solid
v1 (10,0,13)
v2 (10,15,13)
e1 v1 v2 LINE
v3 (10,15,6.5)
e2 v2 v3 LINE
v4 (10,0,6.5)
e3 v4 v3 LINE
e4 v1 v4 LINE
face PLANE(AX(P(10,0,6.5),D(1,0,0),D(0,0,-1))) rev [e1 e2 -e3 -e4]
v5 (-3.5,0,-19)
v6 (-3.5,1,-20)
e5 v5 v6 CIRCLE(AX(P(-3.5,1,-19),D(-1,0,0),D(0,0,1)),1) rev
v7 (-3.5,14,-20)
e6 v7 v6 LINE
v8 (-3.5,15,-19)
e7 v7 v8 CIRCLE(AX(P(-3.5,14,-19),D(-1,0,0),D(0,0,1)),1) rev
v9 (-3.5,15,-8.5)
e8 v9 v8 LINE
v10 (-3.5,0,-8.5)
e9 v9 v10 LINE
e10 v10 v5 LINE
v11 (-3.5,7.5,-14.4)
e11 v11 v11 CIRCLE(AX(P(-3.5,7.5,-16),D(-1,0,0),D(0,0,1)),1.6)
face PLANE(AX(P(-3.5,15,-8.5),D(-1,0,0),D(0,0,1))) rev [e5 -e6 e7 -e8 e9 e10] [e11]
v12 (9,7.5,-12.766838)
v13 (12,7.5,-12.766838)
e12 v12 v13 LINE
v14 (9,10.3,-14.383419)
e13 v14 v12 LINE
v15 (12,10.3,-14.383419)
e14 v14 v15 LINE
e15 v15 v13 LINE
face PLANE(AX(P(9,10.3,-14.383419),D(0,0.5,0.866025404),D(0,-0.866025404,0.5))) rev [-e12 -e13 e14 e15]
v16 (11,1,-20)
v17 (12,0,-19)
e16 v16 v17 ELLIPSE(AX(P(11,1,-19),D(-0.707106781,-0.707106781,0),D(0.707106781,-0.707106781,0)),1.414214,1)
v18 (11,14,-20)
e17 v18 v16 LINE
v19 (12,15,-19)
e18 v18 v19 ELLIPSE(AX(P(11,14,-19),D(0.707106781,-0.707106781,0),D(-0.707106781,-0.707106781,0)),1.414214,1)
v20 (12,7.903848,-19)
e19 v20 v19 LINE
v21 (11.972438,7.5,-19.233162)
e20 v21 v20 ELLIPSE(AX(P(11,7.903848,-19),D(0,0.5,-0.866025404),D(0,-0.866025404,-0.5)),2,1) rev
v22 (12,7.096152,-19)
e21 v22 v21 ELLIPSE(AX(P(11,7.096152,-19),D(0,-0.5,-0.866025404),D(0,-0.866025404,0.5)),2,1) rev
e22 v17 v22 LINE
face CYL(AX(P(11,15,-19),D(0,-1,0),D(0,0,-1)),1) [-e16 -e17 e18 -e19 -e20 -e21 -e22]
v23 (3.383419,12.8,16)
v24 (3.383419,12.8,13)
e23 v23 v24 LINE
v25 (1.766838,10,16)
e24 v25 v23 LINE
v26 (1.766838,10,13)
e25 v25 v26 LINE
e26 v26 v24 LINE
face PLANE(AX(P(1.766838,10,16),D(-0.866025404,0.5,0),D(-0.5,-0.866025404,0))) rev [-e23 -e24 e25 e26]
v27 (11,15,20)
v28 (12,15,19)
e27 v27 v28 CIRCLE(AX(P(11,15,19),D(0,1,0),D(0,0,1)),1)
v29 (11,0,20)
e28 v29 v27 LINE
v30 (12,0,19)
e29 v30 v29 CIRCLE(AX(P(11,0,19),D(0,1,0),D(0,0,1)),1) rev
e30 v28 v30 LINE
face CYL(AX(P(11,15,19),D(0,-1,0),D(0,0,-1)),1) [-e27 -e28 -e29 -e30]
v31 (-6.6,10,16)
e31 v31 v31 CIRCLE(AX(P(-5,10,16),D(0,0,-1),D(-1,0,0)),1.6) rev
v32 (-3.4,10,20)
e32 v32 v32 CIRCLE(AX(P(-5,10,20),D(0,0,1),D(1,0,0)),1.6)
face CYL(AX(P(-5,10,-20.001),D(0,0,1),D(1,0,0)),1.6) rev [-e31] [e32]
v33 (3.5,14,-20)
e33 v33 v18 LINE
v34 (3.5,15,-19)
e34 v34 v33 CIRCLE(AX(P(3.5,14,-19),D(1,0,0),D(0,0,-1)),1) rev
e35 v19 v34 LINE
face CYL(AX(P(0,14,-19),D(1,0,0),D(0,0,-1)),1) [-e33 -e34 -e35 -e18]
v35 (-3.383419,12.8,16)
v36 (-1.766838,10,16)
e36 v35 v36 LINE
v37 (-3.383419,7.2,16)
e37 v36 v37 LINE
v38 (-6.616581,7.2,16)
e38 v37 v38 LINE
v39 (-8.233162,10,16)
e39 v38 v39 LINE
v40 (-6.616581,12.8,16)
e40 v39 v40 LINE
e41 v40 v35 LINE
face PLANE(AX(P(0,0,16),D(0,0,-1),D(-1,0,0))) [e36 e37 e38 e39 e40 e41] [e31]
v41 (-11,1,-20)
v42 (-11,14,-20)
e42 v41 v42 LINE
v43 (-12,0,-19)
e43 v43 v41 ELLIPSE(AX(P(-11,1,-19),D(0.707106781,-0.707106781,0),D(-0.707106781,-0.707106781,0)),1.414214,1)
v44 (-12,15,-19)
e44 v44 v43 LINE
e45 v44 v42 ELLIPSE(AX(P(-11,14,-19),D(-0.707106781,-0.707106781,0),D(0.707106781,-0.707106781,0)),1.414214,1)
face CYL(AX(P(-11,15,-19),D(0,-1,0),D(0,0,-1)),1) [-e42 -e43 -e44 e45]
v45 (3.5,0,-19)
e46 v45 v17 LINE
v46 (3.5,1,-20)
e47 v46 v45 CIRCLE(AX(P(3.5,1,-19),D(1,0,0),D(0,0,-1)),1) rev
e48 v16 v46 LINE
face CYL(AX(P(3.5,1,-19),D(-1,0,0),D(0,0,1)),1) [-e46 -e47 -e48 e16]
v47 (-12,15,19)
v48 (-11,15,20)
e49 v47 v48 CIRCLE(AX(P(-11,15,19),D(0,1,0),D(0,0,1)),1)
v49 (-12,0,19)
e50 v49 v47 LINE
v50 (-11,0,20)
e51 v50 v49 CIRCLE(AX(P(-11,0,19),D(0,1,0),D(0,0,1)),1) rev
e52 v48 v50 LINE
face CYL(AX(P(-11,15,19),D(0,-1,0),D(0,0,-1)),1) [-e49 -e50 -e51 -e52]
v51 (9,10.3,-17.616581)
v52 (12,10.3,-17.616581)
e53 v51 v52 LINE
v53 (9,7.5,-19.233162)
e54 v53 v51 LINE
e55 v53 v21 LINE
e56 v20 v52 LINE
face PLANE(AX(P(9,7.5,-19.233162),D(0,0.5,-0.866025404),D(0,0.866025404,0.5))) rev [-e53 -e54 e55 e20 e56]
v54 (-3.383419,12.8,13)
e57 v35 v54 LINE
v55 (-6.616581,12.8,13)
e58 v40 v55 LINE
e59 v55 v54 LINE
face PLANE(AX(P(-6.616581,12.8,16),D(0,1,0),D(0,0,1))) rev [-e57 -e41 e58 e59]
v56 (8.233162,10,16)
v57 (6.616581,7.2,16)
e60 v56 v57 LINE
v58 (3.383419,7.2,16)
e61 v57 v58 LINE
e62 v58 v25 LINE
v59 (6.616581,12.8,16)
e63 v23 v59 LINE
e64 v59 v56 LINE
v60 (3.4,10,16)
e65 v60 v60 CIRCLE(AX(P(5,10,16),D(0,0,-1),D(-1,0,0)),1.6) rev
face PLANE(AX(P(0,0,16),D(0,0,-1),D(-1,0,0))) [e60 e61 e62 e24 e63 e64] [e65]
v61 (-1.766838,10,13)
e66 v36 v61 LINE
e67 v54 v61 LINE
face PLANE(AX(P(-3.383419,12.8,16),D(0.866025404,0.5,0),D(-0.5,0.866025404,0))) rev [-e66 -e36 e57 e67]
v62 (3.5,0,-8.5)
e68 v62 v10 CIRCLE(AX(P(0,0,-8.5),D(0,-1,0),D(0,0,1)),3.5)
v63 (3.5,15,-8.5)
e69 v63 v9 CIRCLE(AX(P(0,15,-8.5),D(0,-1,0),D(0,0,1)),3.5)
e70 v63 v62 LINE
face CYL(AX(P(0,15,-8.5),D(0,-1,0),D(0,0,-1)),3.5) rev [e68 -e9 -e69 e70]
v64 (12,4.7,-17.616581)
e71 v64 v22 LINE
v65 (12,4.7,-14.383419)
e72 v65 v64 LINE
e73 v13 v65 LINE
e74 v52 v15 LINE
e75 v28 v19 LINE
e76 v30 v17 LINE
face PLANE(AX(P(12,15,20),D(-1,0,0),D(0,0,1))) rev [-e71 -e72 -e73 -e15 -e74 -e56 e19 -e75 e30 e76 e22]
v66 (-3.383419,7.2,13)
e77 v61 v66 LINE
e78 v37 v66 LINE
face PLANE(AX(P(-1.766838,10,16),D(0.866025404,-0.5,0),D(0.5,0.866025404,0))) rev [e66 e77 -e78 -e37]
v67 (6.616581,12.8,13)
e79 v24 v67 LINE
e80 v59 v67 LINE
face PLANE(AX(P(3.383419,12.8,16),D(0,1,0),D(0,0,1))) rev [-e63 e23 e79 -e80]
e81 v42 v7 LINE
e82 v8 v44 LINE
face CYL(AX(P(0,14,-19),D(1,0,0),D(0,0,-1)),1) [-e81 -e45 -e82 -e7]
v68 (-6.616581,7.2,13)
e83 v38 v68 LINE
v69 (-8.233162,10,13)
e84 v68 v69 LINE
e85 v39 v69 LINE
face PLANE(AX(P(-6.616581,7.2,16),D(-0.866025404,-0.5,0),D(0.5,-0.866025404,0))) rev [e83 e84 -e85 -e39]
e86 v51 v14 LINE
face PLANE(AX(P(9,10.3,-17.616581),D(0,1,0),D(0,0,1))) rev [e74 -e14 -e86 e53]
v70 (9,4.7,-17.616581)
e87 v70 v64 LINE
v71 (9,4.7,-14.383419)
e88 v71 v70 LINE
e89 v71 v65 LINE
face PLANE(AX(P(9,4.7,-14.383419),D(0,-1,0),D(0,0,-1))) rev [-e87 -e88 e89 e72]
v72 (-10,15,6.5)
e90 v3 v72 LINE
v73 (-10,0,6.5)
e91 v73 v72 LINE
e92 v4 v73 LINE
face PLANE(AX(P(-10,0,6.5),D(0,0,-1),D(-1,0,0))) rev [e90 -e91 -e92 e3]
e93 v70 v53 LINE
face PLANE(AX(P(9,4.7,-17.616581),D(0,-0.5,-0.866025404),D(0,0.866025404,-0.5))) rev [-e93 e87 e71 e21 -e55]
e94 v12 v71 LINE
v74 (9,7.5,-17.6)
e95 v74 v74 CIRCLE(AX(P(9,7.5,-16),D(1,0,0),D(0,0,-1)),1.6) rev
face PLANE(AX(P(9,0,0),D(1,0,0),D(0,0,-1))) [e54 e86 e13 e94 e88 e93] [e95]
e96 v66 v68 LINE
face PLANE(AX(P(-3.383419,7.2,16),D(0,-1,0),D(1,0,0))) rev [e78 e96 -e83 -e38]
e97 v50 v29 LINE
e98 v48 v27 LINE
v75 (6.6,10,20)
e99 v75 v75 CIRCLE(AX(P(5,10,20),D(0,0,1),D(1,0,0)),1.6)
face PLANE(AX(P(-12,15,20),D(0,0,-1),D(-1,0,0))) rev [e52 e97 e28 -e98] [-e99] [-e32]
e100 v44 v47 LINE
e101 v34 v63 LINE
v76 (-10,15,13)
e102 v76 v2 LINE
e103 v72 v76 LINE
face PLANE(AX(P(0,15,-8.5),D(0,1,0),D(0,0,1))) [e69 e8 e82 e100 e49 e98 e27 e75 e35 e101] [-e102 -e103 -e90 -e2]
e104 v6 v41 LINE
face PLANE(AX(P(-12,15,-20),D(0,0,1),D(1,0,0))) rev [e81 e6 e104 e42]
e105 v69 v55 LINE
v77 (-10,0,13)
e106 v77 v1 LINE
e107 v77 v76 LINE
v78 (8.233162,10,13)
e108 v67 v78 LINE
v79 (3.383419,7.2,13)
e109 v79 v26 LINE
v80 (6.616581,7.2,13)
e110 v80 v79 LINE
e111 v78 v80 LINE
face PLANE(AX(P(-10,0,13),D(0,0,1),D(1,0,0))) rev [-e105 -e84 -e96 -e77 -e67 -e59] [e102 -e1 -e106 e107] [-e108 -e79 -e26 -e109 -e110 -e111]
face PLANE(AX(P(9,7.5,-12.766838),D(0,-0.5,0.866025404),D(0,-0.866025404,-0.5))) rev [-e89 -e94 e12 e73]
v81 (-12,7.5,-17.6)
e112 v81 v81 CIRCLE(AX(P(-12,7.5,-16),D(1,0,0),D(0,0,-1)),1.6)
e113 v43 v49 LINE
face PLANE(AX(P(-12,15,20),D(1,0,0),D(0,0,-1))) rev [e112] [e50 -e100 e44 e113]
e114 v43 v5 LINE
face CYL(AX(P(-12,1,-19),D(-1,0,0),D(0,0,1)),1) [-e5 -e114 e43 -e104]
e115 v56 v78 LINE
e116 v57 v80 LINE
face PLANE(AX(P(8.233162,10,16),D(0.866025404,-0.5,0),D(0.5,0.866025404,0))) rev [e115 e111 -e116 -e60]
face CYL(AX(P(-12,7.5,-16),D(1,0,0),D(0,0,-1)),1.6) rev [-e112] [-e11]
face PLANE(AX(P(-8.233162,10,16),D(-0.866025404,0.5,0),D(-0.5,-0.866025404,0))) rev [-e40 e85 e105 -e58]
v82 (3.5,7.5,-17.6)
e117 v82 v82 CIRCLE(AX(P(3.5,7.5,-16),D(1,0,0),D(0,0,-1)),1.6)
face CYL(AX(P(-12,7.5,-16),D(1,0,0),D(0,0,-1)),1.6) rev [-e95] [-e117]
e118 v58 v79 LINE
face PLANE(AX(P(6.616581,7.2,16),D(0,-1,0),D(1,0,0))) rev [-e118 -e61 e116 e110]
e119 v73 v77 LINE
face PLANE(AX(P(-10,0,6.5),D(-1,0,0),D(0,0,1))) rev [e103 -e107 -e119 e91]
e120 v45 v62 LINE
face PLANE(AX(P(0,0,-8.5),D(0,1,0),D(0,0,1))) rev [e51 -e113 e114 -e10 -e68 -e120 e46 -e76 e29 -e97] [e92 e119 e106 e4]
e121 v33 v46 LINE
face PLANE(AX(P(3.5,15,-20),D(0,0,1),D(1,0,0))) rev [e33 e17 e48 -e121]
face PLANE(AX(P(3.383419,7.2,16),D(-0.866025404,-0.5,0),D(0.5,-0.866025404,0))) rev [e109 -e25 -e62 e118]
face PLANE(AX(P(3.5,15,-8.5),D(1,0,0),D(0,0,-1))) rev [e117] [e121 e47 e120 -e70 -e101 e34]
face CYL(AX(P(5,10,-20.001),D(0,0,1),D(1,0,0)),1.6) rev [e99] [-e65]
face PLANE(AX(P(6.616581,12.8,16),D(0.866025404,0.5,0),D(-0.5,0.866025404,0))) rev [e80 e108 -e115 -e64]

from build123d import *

# Parameters (mm, degrees)
SALIENTE_EXTRUIR2_DEPTH    = 15
CORTAR_EXTRUIR2_DEPTH      = 28.730849248
CORTAR_EXTRUIR2_DEPTH_BACK = 28.730849248
CROQUIS3_R                 = 1.6
CROQUIS4_W                 = 20
CROQUIS4_H                 = 6.5
CORTAR_EXTRUIR3_DEPTH      = 28.730849248
CORTAR_EXTRUIR4_REACH      = 46.373
CROQUIS5_R                 = 1.6
CORTAR_EXTRUIR5_DEPTH      = 3
CORTAR_EXTRUIR6_DEPTH      = 3
REDONDEO1_R                = 1


with BuildPart() as part:
    # Croquis1 → Saliente-Extruir2 (new body)
    with BuildSketch(Plane(origin=(0, 0, 0), x_dir=(1, 0, 0), z_dir=(0, 1, 0))):
        with BuildLine():
            Line((-12, -20), (12, -20))
            Line((12, -20), (12, 20))
            Line((12, 20), (3.5, 20))
            Line((3.5, 20), (3.5, 8.5))
            ThreePointArc((3.5, 8.5), (0, 5), (-3.5, 8.5))
            Line((-3.5, 8.5), (-3.5, 20))
            Line((-3.5, 20), (-12, 20))
            Line((-12, 20), (-12, -20))
        make_face()
    extrude(amount=SALIENTE_EXTRUIR2_DEPTH)

    # Croquis3 → Cortar-Extruir2 (cut, two sides: drawn at the far end of the back side and taken through both)
    with BuildSketch(Plane(origin=(0, 0, 0), x_dir=(0, 0, -1), z_dir=(1, 0, 0)).offset(-CORTAR_EXTRUIR2_DEPTH_BACK)):
        with Locations((16, 7.5)):
            Circle(CROQUIS3_R)
    extrude(amount=CORTAR_EXTRUIR2_DEPTH + CORTAR_EXTRUIR2_DEPTH_BACK, mode=Mode.SUBTRACT)

    # Croquis4 → Cortar-Extruir3 (cut, through all)
    with BuildSketch(Plane(origin=(0, 15, 0), x_dir=(1, 0, 0), z_dir=(0, 1, 0))):
        with Locations((0, -9.75)):
            Rectangle(CROQUIS4_W, CROQUIS4_H)
    extrude(amount=-CORTAR_EXTRUIR3_DEPTH, mode=Mode.SUBTRACT)

    # Croquis5 → Cortar-Extruir4 (cut, up to next)
    with BuildSketch(Plane.XY.offset(20), mode=Mode.PRIVATE) as cortar_extruir4_sk1:
        with Locations((-5, 10)):
            Circle(CROQUIS5_R)
    cortar_extruir4_tool1 = extrude(cortar_extruir4_sk1.sketch, amount=-CORTAR_EXTRUIR4_REACH, mode=Mode.PRIVATE) & part.part
    # Croquis5 → Cortar-Extruir4 (cut, up to next)
    with BuildSketch(Plane.XY.offset(20), mode=Mode.PRIVATE) as cortar_extruir4_sk2:
        with Locations((5, 10)):
            Circle(CROQUIS5_R)
    cortar_extruir4_tool2 = extrude(cortar_extruir4_sk2.sketch, amount=-CORTAR_EXTRUIR4_REACH, mode=Mode.PRIVATE) & part.part
    add(cortar_extruir4_tool1.solids().sort_by_distance((-5, 10, 20))[0], mode=Mode.SUBTRACT)
    add(cortar_extruir4_tool2.solids().sort_by_distance((5, 10, 20))[0], mode=Mode.SUBTRACT)

    # Croquis6 → Cortar-Extruir5 (cut)
    with BuildSketch(Plane(origin=(0, 0, 13), x_dir=(-1, 0, 0), z_dir=(0, 0, -1))):
        Polygon((-3.383419246, 12.8), (-6.616580754, 12.8), (-8.233161507, 10), (-6.616580754, 7.2), (-3.383419246, 7.2), (-1.766838493, 10), align=None)
        Polygon((6.616580754, 12.8), (3.383419246, 12.8), (1.766838493, 10), (3.383419246, 7.2), (6.616580754, 7.2), (8.233161507, 10), align=None)
    extrude(amount=-CORTAR_EXTRUIR5_DEPTH, mode=Mode.SUBTRACT)

    # Croquis7 → Cortar-Extruir6 (cut)
    with BuildSketch(Plane(origin=(12, 0, 0), x_dir=(0, 0, -1), z_dir=(1, 0, 0))):
        Polygon((17.616580754, 4.7), (19.233161507, 7.5), (17.616580754, 10.3), (14.383419246, 10.3), (12.766838493, 7.5), (14.383419246, 4.7), align=None)
    extrude(amount=-CORTAR_EXTRUIR6_DEPTH, mode=Mode.SUBTRACT)

    # Redondeo1
    # the kernel refuses this fillet: 1 mm, written as the material it takes off along each edge
    with BuildSketch(Plane(origin=(14.5, 0, -20), x_dir=(0, 0, 1), z_dir=(-1, 0, 0)), Plane(origin=(-1, 0, -20), x_dir=(0, 0, 1), z_dir=(-1, 0, 0))) as redondeo1_piece_1:
        with BuildLine():
            CenterArc((REDONDEO1_R, REDONDEO1_R), REDONDEO1_R, 180, 90)
            Line((0, REDONDEO1_R), (0, 0))
            Line((0, 0), (REDONDEO1_R, 0))
        make_face()
    extrude(amount=13.5, mode=Mode.SUBTRACT)
    with BuildSketch(Plane(origin=(12, -2.5, -20), x_dir=(0, 0, 1), z_dir=(0, 1, 0)), Plane(origin=(12, -2.5, 20), x_dir=(-1, 0, 0), z_dir=(0, 1, 0))) as redondeo1_piece_2:
        with BuildLine():
            CenterArc((REDONDEO1_R, -REDONDEO1_R), REDONDEO1_R, 90, 90)
            Line((0, -REDONDEO1_R), (0, 0))
            Line((0, 0), (REDONDEO1_R, 0))
        make_face()
    extrude(amount=20, mode=Mode.SUBTRACT)
    with BuildSketch(Plane(origin=(-12, -2.5, 20), x_dir=(1, 0, 0), z_dir=(0, 1, 0)), Plane(origin=(-12, -2.5, -20), x_dir=(0, 0, 1), z_dir=(0, 1, 0))) as redondeo1_piece_3:
        with BuildLine():
            CenterArc((REDONDEO1_R, REDONDEO1_R), REDONDEO1_R, 180, 90)
            Line((0, REDONDEO1_R), (0, 0))
            Line((0, 0), (REDONDEO1_R, 0))
        make_face()
    extrude(amount=20, mode=Mode.SUBTRACT)
    with BuildSketch(Plane(origin=(-1, 15, -20), x_dir=(0, 0, 1), z_dir=(-1, 0, 0)), Plane(origin=(14.5, 15, -20), x_dir=(0, 0, 1), z_dir=(-1, 0, 0))) as redondeo1_piece_4:
        with BuildLine():
            CenterArc((REDONDEO1_R, -REDONDEO1_R), REDONDEO1_R, 90, 90)
            Line((0, -REDONDEO1_R), (0, 0))
            Line((0, 0), (REDONDEO1_R, 0))
        make_face()
    extrude(amount=13.5, mode=Mode.SUBTRACT)


solid = part.part
